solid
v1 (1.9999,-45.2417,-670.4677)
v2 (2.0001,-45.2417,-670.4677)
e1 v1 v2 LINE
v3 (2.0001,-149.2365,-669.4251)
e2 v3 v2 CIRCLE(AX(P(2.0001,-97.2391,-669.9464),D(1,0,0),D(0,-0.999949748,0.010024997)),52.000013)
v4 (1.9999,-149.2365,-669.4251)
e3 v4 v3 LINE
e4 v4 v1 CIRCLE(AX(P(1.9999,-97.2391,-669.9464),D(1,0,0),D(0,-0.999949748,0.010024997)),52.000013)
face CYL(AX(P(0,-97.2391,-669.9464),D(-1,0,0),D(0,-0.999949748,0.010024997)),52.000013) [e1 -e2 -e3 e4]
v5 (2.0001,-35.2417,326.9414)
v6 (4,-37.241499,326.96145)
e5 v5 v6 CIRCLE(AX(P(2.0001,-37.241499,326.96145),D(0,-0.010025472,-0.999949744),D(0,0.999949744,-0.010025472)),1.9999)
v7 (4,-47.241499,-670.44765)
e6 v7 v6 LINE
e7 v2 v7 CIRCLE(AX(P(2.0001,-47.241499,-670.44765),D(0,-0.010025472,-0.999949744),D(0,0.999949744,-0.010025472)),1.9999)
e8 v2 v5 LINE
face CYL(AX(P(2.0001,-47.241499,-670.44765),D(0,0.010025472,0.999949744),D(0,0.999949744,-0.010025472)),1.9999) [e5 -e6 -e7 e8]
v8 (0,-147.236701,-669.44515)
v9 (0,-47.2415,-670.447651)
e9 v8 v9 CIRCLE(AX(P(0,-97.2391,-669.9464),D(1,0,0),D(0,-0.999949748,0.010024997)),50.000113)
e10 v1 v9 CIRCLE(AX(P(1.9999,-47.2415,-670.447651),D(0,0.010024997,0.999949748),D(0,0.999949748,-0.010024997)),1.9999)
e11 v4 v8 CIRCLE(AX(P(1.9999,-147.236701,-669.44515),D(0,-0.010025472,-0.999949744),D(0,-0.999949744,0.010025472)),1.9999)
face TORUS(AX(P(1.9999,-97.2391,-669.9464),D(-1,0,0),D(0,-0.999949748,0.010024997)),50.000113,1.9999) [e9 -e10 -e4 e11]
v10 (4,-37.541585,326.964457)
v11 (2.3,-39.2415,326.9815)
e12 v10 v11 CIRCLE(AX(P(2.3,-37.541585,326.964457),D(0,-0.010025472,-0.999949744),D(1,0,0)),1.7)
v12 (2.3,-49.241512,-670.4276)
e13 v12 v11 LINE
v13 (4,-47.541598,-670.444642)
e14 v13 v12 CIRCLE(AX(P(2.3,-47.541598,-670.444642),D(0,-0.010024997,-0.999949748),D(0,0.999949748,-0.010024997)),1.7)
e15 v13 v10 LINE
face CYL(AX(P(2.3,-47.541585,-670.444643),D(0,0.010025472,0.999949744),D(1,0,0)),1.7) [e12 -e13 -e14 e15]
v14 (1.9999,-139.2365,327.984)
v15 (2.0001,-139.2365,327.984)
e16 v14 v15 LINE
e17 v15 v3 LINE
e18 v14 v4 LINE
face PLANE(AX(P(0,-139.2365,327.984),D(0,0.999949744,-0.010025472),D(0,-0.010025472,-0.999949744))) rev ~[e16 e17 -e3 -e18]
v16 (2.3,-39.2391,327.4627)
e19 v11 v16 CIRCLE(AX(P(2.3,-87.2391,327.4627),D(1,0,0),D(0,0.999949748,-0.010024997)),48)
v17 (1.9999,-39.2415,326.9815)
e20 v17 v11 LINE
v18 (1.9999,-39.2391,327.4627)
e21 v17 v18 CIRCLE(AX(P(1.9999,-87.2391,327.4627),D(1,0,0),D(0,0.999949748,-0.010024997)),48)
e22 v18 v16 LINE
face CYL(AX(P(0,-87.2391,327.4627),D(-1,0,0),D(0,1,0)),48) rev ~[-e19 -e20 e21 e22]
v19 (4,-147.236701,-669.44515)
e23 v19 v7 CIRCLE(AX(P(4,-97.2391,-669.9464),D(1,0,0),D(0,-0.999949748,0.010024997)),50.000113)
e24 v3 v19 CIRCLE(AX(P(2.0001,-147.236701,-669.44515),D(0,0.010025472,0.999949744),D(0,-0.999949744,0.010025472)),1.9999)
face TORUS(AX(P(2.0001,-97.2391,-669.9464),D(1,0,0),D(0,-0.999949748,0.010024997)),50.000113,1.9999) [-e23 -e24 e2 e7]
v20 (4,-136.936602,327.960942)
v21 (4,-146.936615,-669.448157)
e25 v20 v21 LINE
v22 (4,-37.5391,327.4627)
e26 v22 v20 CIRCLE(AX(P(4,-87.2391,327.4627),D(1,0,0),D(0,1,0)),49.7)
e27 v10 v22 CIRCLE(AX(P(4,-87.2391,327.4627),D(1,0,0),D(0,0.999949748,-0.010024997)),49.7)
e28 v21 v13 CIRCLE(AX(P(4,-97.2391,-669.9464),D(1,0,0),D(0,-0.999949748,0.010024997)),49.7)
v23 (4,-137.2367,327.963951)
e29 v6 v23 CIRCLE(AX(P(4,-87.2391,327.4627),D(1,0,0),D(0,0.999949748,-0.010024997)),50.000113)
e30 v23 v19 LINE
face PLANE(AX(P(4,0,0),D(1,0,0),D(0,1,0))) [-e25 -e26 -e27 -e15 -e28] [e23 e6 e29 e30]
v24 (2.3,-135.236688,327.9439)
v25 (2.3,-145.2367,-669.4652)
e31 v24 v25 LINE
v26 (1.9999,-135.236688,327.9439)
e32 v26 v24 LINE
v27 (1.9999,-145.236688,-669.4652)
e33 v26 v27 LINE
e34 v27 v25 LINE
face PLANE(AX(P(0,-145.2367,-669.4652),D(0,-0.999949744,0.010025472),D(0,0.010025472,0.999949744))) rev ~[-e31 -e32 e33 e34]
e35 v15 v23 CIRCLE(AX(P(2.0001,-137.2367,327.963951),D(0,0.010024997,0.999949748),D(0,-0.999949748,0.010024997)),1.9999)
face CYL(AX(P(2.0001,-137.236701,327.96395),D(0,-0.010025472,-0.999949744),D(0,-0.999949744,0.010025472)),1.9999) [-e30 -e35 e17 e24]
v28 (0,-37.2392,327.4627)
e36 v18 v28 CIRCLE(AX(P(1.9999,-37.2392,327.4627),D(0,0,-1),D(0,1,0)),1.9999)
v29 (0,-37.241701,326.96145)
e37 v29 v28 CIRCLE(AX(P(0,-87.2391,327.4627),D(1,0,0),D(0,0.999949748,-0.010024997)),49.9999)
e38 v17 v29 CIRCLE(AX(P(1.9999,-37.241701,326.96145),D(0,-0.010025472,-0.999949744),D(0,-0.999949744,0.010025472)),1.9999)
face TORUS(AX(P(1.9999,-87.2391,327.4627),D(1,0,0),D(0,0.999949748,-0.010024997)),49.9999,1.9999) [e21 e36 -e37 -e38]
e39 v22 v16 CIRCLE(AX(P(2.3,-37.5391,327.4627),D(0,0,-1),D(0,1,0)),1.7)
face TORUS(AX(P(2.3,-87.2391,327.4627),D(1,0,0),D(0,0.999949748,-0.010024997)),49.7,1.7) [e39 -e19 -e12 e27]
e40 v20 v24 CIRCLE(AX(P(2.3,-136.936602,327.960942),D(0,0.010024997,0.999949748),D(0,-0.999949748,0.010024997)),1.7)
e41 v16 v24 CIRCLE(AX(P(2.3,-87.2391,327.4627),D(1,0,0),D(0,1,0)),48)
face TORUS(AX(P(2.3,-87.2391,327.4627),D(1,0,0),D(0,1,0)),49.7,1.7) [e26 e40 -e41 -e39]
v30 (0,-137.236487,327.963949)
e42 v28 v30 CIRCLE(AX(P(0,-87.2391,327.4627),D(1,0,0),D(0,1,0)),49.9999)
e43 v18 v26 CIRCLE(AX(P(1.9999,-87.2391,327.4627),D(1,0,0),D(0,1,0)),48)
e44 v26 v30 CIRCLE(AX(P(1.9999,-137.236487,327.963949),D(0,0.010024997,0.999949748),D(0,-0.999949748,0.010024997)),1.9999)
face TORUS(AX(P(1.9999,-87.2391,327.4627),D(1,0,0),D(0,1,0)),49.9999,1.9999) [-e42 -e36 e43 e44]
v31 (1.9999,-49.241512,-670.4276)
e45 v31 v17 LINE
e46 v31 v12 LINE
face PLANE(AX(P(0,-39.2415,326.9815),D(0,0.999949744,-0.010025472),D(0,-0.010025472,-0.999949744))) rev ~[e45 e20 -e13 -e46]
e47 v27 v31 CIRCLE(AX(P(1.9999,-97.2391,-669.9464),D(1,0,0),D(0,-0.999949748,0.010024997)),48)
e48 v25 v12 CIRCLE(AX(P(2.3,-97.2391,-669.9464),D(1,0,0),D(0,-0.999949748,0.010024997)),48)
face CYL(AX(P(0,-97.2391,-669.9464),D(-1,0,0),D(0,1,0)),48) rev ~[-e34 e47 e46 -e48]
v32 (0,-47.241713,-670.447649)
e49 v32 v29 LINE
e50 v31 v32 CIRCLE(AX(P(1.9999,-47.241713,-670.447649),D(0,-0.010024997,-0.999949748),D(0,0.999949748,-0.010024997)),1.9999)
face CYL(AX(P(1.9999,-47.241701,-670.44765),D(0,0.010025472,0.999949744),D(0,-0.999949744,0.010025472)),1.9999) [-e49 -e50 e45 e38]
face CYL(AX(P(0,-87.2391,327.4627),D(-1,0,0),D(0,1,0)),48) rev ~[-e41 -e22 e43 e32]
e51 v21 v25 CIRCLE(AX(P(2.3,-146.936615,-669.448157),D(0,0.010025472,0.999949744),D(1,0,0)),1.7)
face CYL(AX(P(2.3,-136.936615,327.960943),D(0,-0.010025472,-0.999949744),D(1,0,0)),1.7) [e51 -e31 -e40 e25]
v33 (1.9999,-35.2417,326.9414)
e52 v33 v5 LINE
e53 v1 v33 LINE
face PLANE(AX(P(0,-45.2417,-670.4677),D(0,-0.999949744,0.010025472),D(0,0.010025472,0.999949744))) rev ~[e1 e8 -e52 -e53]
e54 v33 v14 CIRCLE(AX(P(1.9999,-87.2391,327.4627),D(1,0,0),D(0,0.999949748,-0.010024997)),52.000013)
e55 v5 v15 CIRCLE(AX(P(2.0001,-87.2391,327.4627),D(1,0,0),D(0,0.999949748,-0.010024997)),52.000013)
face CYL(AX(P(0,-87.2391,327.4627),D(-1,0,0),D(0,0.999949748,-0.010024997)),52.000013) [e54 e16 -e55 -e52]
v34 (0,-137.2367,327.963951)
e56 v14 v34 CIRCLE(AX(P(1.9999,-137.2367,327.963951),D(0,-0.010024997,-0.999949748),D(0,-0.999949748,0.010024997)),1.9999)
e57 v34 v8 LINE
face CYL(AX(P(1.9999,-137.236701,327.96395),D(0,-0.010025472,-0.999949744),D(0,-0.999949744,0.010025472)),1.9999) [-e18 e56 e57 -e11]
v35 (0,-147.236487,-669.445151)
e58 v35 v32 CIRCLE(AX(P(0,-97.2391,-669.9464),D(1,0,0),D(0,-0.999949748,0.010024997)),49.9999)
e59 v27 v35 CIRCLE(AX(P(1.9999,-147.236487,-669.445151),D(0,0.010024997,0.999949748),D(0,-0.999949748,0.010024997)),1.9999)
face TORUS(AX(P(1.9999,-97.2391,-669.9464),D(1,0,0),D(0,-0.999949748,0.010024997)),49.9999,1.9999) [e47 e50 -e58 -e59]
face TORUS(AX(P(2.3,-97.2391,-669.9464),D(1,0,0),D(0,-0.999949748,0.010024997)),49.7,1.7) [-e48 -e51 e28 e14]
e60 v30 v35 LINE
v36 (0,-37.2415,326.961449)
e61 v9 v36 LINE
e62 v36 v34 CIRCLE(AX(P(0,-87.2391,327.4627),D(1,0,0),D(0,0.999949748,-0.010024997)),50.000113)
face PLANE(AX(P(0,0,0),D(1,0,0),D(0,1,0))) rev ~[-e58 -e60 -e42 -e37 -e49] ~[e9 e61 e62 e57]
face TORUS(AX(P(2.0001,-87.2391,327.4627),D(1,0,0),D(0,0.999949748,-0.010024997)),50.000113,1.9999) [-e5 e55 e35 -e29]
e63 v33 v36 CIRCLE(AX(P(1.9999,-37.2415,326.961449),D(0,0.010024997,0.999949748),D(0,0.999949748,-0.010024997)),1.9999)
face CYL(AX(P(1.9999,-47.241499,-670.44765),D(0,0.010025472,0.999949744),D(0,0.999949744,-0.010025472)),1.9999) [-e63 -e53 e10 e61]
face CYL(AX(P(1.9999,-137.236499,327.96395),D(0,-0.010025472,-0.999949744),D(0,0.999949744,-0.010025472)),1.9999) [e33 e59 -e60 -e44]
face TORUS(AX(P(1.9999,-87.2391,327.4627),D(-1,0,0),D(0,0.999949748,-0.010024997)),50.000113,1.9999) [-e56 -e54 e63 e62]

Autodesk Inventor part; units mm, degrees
ref_plane "YZ Plane" through (0, 0, 0) normal (1, 0, 0) x (0, 1, 0)
ref_plane "XZ Plane" through (0, 0, 0) normal (0, 1, 0) x (-1, 0, 0)
ref_plane "XY Plane" through (0, 0, 0) normal (0, 0, 1) x (1, 0, 0)
sketch "Sketch1" plane through (0, 0, 0) normal (1, 0, 0) x (0, 1, 0)
  circle A0 centre (-87.2391, 327.4627) radius 48 projected
  circle A1 centre (-97.2391, -669.9464) radius 48 projected
  line L0 (-39.2415, 326.9815) -> (-49.2415, -670.4276)
  line L1 (-145.2367, -669.4652) -> (-135.2367, 327.9439)
  arc A2 (-145.2367, -669.4652) -> (-49.2415, -670.4276) centre (-97.2391, -669.9464) ccw
  arc A3 (-39.2415, 326.9815) -> (-135.2367, 327.9439) centre (-87.2391, 327.4627) ccw
  line L2 (-45.2417, -670.4677) -> (-35.2417, 326.9414)
  arc A4 (-35.2417, 326.9414) -> (-139.2365, 327.984) centre (-87.2391, 327.4627) ccw
  line L3 (-139.2365, 327.984) -> (-149.2365, -669.4251)
  arc A5 (-149.2365, -669.4251) -> (-45.2417, -670.4677) centre (-97.2391, -669.9464) ccw
  point P0 (0, 0)
  dimension "d0" = 4
extrude "Extrusion1" add sketch "Sketch1" along normal blind 4
fillet "Fillet1" radius 2 12 edges at (4, -40.2417, -171.7632) (4, -86.7178, 379.4601) (4, -144.2365, -170.7205) (4, -97.7604, -721.9438) (0, -86.7178, 379.4601) (0, -144.2365, -170.7205) (0, -97.7604, -721.9438) (0, -40.2417, -171.7632) (0, -97.7203, -717.944) (0, -140.2367, -170.7606) (0, -86.7579, 375.4603) (0, -44.2415, -171.7231)
fillet "Fillet2" radius 1.7 4 edges at (4, -86.7579, 375.4603) (4, -44.2415, -171.7231) (4, -97.7203, -717.944) (4, -140.2367, -170.7606)
properties part number "Elastic" material "Acetal Resin, Black"
